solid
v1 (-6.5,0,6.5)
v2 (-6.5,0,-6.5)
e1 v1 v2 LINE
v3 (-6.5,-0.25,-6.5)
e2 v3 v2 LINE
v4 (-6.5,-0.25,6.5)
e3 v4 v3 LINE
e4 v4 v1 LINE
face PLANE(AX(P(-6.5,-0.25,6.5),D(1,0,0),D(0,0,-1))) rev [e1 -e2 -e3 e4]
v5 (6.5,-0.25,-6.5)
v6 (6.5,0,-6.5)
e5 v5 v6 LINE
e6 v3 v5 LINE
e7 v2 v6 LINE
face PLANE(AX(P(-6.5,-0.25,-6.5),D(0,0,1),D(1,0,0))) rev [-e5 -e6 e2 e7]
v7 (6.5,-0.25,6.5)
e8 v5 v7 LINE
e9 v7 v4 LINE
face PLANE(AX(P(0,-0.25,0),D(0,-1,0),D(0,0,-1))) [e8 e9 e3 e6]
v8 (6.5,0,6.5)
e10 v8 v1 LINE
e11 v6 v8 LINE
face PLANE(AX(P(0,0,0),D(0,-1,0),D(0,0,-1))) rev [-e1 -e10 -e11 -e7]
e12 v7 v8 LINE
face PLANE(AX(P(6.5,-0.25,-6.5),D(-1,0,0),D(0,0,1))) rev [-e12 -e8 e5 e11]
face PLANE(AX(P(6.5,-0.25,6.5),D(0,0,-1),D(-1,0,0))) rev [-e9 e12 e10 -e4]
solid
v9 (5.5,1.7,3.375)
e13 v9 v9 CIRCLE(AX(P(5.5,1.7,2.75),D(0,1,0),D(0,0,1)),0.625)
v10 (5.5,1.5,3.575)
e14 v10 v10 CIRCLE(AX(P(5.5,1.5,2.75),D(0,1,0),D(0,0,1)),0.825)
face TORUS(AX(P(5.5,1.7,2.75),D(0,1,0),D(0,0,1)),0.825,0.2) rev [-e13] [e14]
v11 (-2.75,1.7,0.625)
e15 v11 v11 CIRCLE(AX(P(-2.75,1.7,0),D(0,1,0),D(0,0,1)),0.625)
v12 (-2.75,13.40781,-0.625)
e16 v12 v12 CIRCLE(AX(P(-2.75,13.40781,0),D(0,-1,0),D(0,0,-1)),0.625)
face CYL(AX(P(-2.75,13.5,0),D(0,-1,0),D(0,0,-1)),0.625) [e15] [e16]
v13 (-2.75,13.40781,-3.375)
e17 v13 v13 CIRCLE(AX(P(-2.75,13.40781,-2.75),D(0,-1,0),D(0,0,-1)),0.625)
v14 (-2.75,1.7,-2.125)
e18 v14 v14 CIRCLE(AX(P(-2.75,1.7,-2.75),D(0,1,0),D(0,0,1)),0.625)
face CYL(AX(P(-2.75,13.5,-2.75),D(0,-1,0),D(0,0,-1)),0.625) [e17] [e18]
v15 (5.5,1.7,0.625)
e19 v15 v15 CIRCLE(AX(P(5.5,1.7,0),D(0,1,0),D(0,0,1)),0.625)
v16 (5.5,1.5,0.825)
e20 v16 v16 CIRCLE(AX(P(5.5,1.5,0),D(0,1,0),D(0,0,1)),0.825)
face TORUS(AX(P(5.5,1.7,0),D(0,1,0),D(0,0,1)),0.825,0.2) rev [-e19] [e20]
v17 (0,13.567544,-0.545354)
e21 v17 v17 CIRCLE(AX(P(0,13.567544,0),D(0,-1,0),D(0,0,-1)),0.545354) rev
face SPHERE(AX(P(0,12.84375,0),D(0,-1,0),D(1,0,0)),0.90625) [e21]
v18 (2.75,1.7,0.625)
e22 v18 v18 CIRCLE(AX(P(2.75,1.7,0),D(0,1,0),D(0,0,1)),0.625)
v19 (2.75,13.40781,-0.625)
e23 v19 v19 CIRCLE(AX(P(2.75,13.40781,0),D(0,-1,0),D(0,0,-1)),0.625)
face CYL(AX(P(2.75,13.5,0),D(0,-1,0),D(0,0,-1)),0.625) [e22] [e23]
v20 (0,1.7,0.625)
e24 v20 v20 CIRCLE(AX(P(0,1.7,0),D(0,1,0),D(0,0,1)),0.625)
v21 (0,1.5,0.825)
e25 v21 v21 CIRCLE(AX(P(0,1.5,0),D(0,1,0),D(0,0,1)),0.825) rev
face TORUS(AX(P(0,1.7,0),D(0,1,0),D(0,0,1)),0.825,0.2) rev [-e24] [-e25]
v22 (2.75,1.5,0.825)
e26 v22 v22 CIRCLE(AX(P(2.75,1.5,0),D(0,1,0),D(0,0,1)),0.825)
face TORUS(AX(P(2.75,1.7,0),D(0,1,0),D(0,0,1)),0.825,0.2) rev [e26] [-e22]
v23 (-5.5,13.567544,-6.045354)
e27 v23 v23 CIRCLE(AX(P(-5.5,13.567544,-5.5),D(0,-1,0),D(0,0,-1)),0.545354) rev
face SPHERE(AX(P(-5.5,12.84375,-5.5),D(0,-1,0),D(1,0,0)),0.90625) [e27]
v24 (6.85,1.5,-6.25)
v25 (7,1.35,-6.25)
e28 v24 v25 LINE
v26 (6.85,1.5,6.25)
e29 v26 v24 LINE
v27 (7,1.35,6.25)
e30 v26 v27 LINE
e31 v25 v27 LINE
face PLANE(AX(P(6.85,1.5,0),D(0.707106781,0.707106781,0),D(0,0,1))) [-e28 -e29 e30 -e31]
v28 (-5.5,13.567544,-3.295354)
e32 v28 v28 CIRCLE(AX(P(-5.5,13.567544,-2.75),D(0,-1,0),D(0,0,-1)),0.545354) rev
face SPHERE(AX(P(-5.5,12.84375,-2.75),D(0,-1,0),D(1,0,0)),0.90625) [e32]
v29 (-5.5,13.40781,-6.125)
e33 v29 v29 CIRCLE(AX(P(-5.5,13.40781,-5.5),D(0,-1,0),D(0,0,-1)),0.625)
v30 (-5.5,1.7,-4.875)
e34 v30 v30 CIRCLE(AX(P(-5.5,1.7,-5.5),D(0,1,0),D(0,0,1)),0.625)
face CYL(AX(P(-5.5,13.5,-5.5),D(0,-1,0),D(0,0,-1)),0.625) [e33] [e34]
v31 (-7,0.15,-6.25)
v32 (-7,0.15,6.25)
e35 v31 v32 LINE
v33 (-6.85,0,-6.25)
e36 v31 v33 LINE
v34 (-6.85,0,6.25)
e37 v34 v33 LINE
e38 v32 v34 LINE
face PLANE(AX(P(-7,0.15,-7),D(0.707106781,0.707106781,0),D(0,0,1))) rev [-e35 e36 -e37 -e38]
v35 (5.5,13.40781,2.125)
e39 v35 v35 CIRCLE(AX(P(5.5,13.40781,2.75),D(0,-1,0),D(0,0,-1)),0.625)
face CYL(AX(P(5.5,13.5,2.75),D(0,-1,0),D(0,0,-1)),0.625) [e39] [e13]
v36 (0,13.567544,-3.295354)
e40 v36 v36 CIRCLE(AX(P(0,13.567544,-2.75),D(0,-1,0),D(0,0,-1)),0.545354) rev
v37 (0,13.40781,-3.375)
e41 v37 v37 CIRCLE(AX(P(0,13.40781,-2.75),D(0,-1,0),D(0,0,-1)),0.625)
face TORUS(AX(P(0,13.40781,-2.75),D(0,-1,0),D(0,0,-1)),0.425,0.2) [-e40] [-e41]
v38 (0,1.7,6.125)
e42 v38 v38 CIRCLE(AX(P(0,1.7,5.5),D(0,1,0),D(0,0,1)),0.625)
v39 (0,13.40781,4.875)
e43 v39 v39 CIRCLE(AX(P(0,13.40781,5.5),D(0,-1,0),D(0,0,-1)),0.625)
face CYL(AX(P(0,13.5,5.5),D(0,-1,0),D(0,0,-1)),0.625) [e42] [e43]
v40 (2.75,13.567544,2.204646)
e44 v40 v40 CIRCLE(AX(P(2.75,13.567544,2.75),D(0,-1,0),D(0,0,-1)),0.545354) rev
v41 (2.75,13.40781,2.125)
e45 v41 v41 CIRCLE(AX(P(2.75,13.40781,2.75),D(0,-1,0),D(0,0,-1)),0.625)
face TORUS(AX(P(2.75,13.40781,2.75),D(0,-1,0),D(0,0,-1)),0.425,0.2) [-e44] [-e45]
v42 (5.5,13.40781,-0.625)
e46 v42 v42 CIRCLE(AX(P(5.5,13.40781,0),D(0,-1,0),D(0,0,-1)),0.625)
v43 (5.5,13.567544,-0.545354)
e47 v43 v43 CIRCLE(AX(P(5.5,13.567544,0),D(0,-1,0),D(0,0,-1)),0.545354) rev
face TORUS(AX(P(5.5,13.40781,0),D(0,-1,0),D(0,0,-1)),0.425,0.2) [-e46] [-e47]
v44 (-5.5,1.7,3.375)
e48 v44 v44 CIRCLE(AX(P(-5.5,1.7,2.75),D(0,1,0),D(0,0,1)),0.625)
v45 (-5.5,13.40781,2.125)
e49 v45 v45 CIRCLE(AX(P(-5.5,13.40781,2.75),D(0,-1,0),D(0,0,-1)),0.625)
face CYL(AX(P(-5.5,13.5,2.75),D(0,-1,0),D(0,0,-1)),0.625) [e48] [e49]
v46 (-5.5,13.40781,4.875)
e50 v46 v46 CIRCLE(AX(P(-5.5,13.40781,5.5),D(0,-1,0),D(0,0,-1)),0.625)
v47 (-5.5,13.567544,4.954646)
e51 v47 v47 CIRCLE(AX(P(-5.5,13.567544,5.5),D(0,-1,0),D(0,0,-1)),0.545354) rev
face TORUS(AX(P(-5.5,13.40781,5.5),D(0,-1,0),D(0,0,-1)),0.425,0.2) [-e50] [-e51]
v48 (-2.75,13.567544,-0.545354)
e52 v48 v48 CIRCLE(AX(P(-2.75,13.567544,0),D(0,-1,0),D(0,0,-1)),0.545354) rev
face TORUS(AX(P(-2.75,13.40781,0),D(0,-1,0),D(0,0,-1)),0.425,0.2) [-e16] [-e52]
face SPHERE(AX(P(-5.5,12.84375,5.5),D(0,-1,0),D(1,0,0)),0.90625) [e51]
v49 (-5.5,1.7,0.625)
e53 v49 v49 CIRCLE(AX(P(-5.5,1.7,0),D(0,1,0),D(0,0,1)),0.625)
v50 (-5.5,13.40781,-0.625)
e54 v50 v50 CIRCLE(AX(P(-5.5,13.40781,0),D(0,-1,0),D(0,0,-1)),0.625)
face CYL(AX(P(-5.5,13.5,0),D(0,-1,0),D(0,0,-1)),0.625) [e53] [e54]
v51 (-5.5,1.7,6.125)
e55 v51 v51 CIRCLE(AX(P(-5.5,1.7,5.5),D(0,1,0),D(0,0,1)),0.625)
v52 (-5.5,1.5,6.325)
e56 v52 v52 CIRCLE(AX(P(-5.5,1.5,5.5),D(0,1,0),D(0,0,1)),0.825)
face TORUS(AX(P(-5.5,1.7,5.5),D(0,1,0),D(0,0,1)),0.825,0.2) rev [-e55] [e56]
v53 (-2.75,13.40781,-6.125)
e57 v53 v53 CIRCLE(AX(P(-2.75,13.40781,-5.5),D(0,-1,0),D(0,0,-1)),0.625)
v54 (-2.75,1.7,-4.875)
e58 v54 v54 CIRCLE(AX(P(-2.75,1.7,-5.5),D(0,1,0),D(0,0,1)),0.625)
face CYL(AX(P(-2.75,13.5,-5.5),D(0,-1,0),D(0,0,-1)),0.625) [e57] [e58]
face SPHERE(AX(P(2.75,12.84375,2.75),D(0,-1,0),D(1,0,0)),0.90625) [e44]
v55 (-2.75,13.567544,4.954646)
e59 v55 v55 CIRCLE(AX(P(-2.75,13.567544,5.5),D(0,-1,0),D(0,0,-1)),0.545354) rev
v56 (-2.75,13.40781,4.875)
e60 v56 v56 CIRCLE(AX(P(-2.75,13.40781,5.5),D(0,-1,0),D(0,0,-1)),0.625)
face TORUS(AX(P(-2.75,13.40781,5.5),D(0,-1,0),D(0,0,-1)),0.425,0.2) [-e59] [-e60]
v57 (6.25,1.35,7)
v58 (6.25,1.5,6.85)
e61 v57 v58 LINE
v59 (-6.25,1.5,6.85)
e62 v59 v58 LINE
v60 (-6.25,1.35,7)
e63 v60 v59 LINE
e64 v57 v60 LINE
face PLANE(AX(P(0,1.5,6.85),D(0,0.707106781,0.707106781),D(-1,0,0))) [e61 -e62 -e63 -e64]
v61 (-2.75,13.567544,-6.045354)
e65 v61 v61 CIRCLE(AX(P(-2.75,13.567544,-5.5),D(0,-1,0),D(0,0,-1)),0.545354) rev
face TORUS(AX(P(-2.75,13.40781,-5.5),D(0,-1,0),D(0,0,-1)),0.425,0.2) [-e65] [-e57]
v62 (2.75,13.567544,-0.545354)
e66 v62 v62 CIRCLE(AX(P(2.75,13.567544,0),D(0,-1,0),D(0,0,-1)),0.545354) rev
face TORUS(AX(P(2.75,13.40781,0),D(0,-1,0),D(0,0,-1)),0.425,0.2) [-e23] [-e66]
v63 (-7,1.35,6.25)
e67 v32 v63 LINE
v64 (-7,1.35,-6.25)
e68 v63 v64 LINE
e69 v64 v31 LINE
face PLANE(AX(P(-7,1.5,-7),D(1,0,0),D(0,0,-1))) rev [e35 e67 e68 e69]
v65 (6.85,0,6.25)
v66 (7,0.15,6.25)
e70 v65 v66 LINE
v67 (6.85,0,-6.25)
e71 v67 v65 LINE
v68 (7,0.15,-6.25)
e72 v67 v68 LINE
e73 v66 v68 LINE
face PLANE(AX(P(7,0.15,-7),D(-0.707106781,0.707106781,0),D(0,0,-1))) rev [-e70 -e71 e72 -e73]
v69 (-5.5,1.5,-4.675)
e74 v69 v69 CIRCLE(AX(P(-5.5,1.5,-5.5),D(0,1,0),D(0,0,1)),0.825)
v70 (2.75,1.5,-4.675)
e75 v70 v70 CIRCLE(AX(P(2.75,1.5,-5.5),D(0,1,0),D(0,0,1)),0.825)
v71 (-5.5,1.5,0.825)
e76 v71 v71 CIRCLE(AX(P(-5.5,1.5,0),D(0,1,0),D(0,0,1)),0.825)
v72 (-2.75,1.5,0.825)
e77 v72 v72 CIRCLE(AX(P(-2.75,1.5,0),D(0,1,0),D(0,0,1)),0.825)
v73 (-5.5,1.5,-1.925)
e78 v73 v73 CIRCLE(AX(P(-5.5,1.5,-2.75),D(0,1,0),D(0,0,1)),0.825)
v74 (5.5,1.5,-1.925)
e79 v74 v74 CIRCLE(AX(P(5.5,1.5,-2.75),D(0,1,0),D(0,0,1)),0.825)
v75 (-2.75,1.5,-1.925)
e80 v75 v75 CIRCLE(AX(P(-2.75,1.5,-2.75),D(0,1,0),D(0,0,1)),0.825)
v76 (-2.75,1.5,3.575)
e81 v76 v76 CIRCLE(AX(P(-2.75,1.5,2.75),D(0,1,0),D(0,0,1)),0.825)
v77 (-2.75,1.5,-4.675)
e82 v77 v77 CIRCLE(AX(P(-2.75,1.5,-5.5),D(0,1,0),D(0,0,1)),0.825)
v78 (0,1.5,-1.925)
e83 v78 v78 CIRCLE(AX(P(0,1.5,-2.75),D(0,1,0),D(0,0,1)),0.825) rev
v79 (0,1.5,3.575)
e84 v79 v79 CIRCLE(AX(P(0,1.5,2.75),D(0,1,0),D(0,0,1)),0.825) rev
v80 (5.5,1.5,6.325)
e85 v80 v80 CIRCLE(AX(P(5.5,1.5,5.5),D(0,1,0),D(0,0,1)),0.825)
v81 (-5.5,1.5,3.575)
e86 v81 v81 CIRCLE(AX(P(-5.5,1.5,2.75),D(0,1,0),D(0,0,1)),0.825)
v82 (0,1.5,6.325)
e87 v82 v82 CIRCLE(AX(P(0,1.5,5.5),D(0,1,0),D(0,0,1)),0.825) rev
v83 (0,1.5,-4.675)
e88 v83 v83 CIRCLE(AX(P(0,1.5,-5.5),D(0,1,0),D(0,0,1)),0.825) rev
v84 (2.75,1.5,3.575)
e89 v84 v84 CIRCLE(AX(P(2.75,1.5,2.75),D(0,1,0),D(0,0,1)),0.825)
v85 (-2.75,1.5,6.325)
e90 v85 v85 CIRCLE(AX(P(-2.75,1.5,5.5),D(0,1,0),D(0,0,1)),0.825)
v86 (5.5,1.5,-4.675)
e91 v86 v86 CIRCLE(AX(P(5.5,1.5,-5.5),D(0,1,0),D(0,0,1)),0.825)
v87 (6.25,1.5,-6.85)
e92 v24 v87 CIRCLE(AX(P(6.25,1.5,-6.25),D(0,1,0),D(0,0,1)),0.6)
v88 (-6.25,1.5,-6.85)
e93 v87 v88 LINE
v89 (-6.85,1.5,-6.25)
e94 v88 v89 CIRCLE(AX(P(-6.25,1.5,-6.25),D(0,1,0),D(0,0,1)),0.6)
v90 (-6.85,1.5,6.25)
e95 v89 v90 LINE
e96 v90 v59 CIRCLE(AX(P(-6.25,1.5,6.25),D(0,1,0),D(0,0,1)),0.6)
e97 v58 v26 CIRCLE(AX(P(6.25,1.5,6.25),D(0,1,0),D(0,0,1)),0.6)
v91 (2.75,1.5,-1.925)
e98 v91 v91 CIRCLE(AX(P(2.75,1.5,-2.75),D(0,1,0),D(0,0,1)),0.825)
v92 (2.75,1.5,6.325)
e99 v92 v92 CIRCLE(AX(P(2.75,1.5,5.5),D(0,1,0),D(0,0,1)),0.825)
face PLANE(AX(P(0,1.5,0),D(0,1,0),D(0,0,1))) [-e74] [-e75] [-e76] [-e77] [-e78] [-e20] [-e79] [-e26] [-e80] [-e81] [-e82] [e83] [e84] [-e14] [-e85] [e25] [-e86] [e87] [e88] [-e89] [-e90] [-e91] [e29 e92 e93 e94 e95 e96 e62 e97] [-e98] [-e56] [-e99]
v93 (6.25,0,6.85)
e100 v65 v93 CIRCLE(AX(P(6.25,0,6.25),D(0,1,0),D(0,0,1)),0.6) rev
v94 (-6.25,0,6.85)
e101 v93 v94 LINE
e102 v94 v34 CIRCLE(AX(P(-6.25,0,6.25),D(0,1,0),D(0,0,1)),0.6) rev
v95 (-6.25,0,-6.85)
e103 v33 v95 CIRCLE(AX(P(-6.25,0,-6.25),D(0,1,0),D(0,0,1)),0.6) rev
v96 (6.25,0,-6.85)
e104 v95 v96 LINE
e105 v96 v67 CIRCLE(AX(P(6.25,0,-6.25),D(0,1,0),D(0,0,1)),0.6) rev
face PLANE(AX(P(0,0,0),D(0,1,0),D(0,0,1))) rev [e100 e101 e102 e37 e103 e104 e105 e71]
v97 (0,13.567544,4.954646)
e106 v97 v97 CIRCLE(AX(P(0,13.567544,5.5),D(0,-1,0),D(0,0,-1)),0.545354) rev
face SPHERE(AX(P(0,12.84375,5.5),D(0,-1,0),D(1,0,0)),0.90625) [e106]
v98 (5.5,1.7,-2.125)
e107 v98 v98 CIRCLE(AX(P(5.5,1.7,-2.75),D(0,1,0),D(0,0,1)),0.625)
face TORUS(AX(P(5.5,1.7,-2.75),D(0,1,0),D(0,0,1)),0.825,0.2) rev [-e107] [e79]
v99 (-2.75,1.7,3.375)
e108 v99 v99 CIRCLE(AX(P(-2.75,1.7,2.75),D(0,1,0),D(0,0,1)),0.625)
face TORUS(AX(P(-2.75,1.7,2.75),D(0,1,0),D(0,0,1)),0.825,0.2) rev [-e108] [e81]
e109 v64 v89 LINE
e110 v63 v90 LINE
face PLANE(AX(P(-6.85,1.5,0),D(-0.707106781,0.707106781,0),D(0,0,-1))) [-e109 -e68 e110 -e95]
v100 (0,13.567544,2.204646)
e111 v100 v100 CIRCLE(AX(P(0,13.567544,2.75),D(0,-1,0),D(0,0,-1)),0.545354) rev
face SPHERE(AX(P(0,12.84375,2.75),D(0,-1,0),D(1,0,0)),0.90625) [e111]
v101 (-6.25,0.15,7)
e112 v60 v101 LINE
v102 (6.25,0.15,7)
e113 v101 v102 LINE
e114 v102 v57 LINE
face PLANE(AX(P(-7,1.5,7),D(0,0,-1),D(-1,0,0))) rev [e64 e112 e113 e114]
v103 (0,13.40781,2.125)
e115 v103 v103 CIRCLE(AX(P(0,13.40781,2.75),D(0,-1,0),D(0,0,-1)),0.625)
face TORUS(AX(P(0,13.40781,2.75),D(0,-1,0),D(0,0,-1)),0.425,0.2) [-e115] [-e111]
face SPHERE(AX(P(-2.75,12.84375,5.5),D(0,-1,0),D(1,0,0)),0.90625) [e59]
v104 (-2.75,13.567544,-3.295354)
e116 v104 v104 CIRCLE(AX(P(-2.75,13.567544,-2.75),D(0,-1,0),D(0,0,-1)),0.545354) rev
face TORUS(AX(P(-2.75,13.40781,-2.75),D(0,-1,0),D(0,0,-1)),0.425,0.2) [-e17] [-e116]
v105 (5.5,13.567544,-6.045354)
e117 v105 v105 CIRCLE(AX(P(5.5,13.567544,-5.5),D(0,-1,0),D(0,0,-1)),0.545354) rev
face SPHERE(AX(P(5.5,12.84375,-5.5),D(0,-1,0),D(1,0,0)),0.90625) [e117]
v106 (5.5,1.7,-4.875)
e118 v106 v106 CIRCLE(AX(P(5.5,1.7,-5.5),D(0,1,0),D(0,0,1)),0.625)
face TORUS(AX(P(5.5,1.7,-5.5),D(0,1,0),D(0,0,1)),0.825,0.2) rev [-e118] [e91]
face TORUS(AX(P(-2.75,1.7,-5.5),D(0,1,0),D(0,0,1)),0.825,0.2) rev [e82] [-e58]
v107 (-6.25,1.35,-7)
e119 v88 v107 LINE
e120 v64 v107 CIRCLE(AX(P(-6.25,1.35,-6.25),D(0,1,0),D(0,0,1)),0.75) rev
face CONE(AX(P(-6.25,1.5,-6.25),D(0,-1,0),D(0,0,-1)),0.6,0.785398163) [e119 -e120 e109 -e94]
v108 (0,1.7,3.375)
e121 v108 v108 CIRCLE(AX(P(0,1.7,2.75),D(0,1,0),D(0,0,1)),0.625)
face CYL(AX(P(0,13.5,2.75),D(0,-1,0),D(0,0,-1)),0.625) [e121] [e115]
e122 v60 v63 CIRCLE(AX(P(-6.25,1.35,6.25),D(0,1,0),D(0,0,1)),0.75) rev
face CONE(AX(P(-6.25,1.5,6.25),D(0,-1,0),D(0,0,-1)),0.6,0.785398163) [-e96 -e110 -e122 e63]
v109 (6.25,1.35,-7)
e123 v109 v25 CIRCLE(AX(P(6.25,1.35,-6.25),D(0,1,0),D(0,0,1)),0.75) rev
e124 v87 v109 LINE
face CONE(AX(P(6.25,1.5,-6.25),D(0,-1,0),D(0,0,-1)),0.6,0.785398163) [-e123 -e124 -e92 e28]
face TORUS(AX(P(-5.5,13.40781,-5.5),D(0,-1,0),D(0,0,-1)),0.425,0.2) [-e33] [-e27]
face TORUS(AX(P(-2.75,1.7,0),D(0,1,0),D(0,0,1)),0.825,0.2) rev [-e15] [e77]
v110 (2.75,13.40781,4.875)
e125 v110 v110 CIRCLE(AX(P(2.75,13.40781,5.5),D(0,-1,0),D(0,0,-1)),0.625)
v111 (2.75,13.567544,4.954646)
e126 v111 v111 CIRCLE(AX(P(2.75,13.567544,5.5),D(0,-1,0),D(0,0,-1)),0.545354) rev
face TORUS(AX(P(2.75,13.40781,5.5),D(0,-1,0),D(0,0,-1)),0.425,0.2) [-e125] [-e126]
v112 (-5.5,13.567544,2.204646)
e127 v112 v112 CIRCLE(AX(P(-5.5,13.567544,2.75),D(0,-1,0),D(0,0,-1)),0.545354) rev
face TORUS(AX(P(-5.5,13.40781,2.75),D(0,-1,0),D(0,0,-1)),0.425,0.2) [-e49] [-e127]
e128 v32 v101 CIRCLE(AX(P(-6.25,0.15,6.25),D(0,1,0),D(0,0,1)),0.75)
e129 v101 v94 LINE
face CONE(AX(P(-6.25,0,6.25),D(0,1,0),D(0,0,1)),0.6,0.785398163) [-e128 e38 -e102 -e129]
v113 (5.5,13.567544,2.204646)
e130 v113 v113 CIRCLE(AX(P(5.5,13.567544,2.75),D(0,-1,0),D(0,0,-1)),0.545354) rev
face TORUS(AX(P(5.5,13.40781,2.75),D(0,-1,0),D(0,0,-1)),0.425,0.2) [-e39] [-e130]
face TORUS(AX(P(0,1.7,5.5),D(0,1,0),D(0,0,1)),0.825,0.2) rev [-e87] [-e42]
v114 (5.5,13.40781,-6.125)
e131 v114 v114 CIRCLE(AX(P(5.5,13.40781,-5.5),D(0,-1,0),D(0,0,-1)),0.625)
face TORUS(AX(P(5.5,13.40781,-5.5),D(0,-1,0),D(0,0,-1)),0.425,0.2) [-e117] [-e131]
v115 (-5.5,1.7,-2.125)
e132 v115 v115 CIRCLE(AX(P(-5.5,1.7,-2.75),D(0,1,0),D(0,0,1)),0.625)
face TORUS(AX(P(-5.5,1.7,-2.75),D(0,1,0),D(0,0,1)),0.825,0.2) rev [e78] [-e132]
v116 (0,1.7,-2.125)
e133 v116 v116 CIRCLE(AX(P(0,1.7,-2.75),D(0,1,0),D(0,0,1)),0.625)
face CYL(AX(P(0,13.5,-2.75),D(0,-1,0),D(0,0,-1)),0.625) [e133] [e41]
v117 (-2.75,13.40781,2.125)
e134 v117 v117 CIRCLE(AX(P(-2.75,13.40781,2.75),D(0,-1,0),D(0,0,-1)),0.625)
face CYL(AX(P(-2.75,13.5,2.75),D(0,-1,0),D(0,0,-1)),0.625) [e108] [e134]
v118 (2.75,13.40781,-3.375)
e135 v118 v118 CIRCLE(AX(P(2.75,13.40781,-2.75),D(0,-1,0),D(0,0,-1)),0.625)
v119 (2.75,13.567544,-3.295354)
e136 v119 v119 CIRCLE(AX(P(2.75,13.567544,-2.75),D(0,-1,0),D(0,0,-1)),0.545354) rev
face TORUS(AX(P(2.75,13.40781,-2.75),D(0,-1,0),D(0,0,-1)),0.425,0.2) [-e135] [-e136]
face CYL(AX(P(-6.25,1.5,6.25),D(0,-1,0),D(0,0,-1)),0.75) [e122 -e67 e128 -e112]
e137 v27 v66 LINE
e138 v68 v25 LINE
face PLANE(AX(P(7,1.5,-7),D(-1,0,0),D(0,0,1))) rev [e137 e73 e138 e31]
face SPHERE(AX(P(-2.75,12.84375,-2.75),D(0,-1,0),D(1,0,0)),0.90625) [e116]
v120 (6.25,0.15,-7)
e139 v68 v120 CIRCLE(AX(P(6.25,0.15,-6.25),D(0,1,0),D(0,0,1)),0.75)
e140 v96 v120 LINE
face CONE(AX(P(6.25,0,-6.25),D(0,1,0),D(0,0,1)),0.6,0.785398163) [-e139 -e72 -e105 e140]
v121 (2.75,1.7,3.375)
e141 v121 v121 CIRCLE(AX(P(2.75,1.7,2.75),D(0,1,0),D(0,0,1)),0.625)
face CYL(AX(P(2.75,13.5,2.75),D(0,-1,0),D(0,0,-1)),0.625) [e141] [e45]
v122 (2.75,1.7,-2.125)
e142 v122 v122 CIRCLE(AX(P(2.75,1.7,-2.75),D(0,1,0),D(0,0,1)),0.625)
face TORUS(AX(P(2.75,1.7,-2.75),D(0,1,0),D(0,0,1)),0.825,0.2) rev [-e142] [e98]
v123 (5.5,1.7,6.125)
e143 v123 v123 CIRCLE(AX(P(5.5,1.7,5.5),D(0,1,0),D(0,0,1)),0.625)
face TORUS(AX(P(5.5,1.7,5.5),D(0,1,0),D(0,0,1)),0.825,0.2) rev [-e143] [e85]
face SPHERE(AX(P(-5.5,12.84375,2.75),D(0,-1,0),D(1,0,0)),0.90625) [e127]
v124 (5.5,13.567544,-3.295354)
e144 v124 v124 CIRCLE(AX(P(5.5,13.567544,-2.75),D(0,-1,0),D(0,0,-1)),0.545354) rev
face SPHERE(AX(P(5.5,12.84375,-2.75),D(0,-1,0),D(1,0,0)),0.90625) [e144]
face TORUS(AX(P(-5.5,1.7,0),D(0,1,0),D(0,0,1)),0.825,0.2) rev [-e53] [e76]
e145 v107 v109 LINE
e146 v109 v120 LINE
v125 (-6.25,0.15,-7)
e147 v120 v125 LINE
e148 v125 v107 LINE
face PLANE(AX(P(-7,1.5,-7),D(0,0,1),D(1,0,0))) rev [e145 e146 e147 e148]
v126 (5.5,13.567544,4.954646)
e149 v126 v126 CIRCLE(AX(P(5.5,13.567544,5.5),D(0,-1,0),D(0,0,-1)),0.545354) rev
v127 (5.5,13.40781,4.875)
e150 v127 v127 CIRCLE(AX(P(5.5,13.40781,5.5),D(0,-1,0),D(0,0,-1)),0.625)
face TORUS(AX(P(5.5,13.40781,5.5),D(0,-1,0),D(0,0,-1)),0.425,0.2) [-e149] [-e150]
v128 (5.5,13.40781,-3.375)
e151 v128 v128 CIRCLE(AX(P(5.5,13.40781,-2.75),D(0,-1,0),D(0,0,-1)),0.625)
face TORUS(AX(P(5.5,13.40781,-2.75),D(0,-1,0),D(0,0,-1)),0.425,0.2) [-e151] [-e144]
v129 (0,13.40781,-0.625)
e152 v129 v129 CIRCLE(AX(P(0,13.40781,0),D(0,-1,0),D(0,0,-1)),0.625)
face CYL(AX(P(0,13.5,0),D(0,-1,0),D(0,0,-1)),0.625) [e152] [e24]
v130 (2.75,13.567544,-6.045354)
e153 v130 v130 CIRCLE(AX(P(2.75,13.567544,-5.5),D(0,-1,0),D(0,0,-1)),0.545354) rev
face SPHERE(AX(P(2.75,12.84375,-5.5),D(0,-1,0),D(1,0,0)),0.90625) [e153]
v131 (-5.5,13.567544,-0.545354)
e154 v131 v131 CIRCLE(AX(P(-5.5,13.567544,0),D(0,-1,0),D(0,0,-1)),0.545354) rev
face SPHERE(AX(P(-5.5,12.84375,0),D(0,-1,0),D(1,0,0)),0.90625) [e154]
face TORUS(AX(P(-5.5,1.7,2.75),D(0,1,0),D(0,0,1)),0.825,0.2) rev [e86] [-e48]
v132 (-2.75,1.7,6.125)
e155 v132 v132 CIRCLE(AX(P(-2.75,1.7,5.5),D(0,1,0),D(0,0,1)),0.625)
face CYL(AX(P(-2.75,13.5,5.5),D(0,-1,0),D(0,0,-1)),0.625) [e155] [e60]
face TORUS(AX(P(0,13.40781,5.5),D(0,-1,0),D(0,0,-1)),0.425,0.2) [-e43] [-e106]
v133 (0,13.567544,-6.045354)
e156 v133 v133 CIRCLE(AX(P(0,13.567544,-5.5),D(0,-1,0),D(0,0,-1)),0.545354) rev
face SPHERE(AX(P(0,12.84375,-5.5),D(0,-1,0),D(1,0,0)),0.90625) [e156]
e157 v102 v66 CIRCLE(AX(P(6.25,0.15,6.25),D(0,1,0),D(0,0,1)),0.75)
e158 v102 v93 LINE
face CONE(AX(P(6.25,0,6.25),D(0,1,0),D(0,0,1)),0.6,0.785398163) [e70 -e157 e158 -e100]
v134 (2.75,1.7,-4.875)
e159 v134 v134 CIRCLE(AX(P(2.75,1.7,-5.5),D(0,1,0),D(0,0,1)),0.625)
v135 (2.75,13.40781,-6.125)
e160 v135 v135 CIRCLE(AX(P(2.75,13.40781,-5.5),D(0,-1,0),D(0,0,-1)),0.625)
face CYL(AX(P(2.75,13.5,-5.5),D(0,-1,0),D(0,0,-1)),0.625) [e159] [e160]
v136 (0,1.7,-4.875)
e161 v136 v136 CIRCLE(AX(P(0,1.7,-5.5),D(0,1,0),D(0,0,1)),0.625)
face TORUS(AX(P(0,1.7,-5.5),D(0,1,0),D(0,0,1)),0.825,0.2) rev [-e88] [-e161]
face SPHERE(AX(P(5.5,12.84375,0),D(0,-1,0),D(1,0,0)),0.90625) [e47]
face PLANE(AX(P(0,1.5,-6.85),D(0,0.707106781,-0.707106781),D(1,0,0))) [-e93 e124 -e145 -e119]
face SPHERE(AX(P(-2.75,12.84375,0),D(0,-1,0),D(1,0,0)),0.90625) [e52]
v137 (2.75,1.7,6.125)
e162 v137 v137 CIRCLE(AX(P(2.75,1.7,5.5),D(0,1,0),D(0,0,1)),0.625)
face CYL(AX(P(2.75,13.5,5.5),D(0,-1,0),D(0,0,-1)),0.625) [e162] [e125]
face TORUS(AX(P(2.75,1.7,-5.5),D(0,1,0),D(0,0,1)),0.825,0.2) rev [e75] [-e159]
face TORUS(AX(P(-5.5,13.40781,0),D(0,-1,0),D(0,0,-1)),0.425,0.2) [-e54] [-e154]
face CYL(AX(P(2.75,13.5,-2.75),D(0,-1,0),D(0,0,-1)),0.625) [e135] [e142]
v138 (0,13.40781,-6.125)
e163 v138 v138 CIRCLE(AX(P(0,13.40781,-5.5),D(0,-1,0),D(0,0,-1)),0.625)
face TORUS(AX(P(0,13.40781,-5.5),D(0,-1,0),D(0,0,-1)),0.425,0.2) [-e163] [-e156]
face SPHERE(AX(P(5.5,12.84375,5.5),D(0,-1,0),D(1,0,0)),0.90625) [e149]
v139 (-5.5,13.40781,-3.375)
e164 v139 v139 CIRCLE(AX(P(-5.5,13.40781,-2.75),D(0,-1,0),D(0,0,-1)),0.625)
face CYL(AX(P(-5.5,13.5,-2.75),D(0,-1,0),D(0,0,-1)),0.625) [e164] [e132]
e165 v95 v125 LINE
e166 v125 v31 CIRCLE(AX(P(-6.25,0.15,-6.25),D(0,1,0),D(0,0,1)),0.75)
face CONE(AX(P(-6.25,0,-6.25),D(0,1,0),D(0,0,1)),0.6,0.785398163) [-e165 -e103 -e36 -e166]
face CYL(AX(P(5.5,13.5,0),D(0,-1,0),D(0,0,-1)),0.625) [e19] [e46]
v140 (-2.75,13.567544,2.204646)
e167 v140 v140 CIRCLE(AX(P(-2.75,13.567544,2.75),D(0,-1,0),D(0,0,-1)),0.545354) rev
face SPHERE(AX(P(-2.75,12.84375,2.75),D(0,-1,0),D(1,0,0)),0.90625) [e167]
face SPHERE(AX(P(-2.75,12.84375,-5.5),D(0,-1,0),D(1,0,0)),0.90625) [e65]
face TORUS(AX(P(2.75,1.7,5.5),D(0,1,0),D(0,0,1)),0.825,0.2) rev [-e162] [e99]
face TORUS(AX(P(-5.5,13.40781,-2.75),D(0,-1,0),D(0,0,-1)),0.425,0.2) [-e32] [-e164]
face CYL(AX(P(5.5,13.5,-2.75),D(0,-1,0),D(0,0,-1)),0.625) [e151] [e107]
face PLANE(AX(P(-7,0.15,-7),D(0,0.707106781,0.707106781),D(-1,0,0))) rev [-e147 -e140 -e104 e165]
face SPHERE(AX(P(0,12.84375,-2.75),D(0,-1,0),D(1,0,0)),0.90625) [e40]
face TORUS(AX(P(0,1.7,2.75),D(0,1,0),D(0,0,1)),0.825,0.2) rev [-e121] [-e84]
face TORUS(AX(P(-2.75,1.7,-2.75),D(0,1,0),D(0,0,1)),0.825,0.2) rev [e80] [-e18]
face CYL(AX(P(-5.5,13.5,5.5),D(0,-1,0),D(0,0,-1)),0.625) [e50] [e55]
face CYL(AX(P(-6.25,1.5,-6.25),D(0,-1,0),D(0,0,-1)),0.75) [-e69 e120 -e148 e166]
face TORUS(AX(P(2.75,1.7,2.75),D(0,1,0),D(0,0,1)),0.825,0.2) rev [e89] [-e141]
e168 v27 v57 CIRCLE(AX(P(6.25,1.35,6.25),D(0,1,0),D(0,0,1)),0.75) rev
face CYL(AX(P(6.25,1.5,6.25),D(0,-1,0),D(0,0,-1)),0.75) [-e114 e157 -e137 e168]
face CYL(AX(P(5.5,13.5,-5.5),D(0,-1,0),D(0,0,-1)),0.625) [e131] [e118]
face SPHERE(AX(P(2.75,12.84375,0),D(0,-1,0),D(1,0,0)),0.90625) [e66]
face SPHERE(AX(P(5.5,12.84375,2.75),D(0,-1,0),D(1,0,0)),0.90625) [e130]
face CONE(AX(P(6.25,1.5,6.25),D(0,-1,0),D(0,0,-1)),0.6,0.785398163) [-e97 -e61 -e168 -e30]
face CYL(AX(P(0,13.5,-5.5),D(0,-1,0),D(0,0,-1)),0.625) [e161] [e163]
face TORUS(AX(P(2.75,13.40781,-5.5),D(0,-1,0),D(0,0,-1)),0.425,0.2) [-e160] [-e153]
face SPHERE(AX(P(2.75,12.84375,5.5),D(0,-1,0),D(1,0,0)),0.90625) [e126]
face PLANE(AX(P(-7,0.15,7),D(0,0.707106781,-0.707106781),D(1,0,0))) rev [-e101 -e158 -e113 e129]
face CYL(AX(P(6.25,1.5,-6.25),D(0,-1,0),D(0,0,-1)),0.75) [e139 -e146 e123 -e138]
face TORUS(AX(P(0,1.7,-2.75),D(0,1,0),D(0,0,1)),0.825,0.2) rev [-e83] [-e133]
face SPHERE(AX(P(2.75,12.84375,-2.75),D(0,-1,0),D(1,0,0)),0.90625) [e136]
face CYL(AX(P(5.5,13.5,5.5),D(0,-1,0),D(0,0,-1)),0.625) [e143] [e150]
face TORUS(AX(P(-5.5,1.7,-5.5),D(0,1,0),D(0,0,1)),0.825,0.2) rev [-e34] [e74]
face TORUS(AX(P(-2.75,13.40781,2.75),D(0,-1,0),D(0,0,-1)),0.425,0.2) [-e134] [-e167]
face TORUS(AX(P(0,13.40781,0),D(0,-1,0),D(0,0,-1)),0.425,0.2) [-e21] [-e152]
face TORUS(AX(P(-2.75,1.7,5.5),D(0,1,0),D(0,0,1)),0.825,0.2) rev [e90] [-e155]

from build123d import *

# Parameters (mm, degrees)
BOSS_EXTRU_1_DEPTH                   = 1.5
CONG_1_R                             = 0.75
CHANFREIN1_SIZE                      = 0.15
ESQUISSE3_R                          = 0.625
BOSS_EXTRU_2_DEPTH                   = 12
CONG_2_R                             = 0.2
R_P_TITION_LIN_AIRE1_COUNT           = 3
R_P_TITION_LIN_AIRE1_PITCH           = 2.75
CONG_2_OF_R_P_TITION_LIN_AIRE1_R     = 0.2
R_P_TITION_LIN_AIRE1_COL_COUNT       = 3
R_P_TITION_LIN_AIRE1_COL_PITCH       = 2.75
CONG_2_OF_R_P_TITION_LIN_AIRE1_COL_R = 0.2
BOSS_EXTRU_3_DEPTH                   = 0.25


# Read off the part's stored shape, not the designer's step: Répétition linéaire2
with BuildPart() as part:
    # Esquisse1 → Boss.-Extru.1 (new body)
    with BuildSketch(Plane(origin=(0, 0, 0), x_dir=(1, 0, 0), z_dir=(0, 1, 0))):
        Polygon((-6.999999999999999, 6.999999999999999), (6.999999999999999, 6.999999999999999), (7.000000000000003, -6.999999999999999), (-6.999999999999996, -6.999999999999999), align=None)
    extrude(amount=BOSS_EXTRU_1_DEPTH)

    # Congé1
    cong_1_edges = [part.edges().sort_by_distance(p)[0] for p in [
        (7.000000000000003, 0.75, 6.999999999999999),
        (-6.999999999999996, 0.75, 6.999999999999999),
        (-6.999999999999999, 0.75, -6.999999999999999),
        (6.999999999999999, 0.75, -6.999999999999999),
    ]]
    fillet(cong_1_edges, radius=CONG_1_R)

    # Chanfrein1
    chanfrein1_edges = [part.edges().sort_by_distance(p)[0] for p in [
        (3.55e-15, 0, 6.999999999999999),
        (3.55e-15, 1.5, 6.999999999999999),
        (7.000000000000001, 0, 0),
        (-6.999999999999997, 0, 0),
        (0, 0, -6.999999999999999),
        (6.780330085889913, 0, 6.78033008588991),
        (6.78033008588991, 0, -6.78033008588991),
        (-6.78033008588991, 0, -6.78033008588991),
        (-6.780330085889906, 0, 6.78033008588991),
        (-6.999999999999997, 1.5, 0),
        (7.000000000000001, 1.5, 0),
        (0, 1.5, -6.999999999999999),
        (6.780330085889913, 1.5, 6.78033008588991),
        (6.78033008588991, 1.5, -6.78033008588991),
        (-6.78033008588991, 1.5, -6.78033008588991),
        (-6.780330085889906, 1.5, 6.78033008588991),
    ]]
    chamfer(chanfrein1_edges, length=CHANFREIN1_SIZE)

    # Esquisse3 → Boss.-Extru.2 (add)
    with BuildSketch(Plane(origin=(0, 1.5, 0), x_dir=(1, 0, 0), z_dir=(0, 1, 0))):
        with Locations(Location((0, 0, 0), (0, 0, 270))):
            Circle(ESQUISSE3_R)
    boss_extru_2 = extrude(amount=BOSS_EXTRU_2_DEPTH)

    # Esquisse4 → Révolution1 (revolve)
    with BuildSketch(Plane.XY):
        with BuildLine():
            Line((0, 13.5), (0, 13.75))
            ThreePointArc((0, 13.75), (0.3365728004459065, 13.685182001114766), (0.625, 13.5))
            Line((0.625, 13.5), (0, 13.5))
        make_face()
    r_volution1 = revolve(axis=Axis((0, 13.5, 0), (0, 1, 0)))

    # Congé2
    cong_2_edges = [part.edges().sort_by_distance(p)[0] for p in [
        (1.9e-16, 1.5, -0.625),
        (-0.4419417382415921, 13.5, -0.4419417382415924),
    ]]
    fillet(cong_2_edges, radius=CONG_2_R)

    # Répétition linéaire1: Boss.-Extru.2, Révolution1 ×3
    with Locations(*[(0, 0, -i * R_P_TITION_LIN_AIRE1_PITCH) for i in range(1, R_P_TITION_LIN_AIRE1_COUNT)]):
        add(boss_extru_2)
        add(r_volution1)

    # Congé2 of Répétition linéaire1
    cong_2_of_r_p_tition_lin_aire1_edges = [part.edges().sort_by_distance(p)[0] for p in [
        (-5.7e-16, 1.5, -3.375),
        (-0.4419417382415929, 13.5, -3.191941738241592),
        (-1.34e-15, 1.5, -6.125),
        (-0.44194173824159366, 13.5, -5.941941738241592),
    ]]
    fillet(cong_2_of_r_p_tition_lin_aire1_edges, radius=CONG_2_OF_R_P_TITION_LIN_AIRE1_R)

    # Répétition linéaire1 col: Boss.-Extru.2, Révolution1 ×3
    with Locations(*[(0, 0, i * R_P_TITION_LIN_AIRE1_COL_PITCH) for i in range(1, R_P_TITION_LIN_AIRE1_COL_COUNT)]):
        add(boss_extru_2)
        add(r_volution1)

    # Congé2 of Répétition linéaire1 col
    cong_2_of_r_p_tition_lin_aire1_col_edges = [part.edges().sort_by_distance(p)[0] for p in [
        (9.5e-16, 1.5, 2.125),
        (-0.44194173824159133, 13.5, 2.308058261758408),
        (1.72e-15, 1.5, 4.875),
        (-0.44194173824159055, 13.5, 5.058058261758408),
    ]]
    fillet(cong_2_of_r_p_tition_lin_aire1_col_edges, radius=CONG_2_OF_R_P_TITION_LIN_AIRE1_COL_R)

    # Répétition linéaire2 outline → Répétition linéaire2 (revolve)
    with BuildSketch(Plane(origin=(2.75, 0, -2.75), x_dir=(1, 0, 0), z_dir=(0, 0, 1))):
        with BuildLine():
            Line((0, 1.5), (0.825, 1.5))
            ThreePointArc((0.825, 1.5), (0.683578644, 1.558578644), (0.625, 1.7))
            Line((0.625, 1.7), (0.625, 13.407810336))
            ThreePointArc((0.625, 13.407810336), (0.603984352, 13.497054953), (0.545353982, 13.567544236))
            ThreePointArc((0.545353982, 13.567544236), (0.287533073, 13.703176433), (0, 13.75))
            Line((0, 13.75), (0, 1.5))
        make_face()
    revolve(axis=Axis((2.75, 0, -2.75), (0, 1, 0)))

    # R_p_tition lin_aire2 2 outline → R_p_tition lin_aire2 2 (revolve)
    with BuildSketch(Plane(origin=(5.5, 0, -2.75), x_dir=(1, 0, 0), z_dir=(0, 0, 1))):
        with BuildLine():
            Line((0, 1.5), (0.825, 1.5))
            ThreePointArc((0.825, 1.5), (0.683578644, 1.558578644), (0.625, 1.7))
            Line((0.625, 1.7), (0.625, 13.407810336))
            ThreePointArc((0.625, 13.407810336), (0.603984352, 13.497054953), (0.545353982, 13.567544236))
            ThreePointArc((0.545353982, 13.567544236), (0.287533073, 13.703176433), (0, 13.75))
            Line((0, 13.75), (0, 1.5))
        make_face()
    revolve(axis=Axis((5.5, 0, -2.75), (0, 1, 0)))

    # R_p_tition lin_aire2 3 outline → R_p_tition lin_aire2 3 (revolve)
    with BuildSketch(Plane(origin=(-2.75, 0, -2.75), x_dir=(1, 0, 0), z_dir=(0, 0, 1))):
        with BuildLine():
            Line((0, 1.5), (0.825, 1.5))
            ThreePointArc((0.825, 1.5), (0.683578644, 1.558578644), (0.625, 1.7))
            Line((0.625, 1.7), (0.625, 13.407810336))
            ThreePointArc((0.625, 13.407810336), (0.603984352, 13.497054953), (0.545353982, 13.567544236))
            ThreePointArc((0.545353982, 13.567544236), (0.287533073, 13.703176433), (0, 13.75))
            Line((0, 13.75), (0, 1.5))
        make_face()
    revolve(axis=Axis((-2.75, 0, -2.75), (0, 1, 0)))

    # R_p_tition lin_aire2 4 outline → R_p_tition lin_aire2 4 (revolve)
    with BuildSketch(Plane(origin=(-5.5, 0, -2.75), x_dir=(1, 0, 0), z_dir=(0, 0, 1))):
        with BuildLine():
            Line((0, 1.5), (0.825, 1.5))
            ThreePointArc((0.825, 1.5), (0.683578644, 1.558578644), (0.625, 1.7))
            Line((0.625, 1.7), (0.625, 13.407810336))
            ThreePointArc((0.625, 13.407810336), (0.603984352, 13.497054953), (0.545353982, 13.567544236))
            ThreePointArc((0.545353982, 13.567544236), (0.287533073, 13.703176433), (0, 13.75))
            Line((0, 13.75), (0, 1.5))
        make_face()
    revolve(axis=Axis((-5.5, 0, -2.75), (0, 1, 0)))

    # R_p_tition lin_aire2 5 outline → R_p_tition lin_aire2 5 (revolve)
    with BuildSketch(Plane(origin=(2.75, 0, 0), x_dir=(1, 0, 0), z_dir=(0, 0, 1))):
        with BuildLine():
            Line((0, 1.5), (0.825, 1.5))
            ThreePointArc((0.825, 1.5), (0.683578644, 1.558578644), (0.625, 1.7))
            Line((0.625, 1.7), (0.625, 13.407810336))
            ThreePointArc((0.625, 13.407810336), (0.603984352, 13.497054953), (0.545353982, 13.567544236))
            ThreePointArc((0.545353982, 13.567544236), (0.287533073, 13.703176433), (0, 13.75))
            Line((0, 13.75), (0, 1.5))
        make_face()
    revolve(axis=Axis((2.75, 0, 0), (0, 1, 0)))

    # R_p_tition lin_aire2 6 outline → R_p_tition lin_aire2 6 (revolve)
    with BuildSketch(Plane(origin=(5.5, 0, 0), x_dir=(1, 0, 0), z_dir=(0, 0, 1))):
        with BuildLine():
            Line((0, 1.5), (0.825, 1.5))
            ThreePointArc((0.825, 1.5), (0.683578644, 1.558578644), (0.625, 1.7))
            Line((0.625, 1.7), (0.625, 13.407810336))
            ThreePointArc((0.625, 13.407810336), (0.603984352, 13.497054953), (0.545353982, 13.567544236))
            ThreePointArc((0.545353982, 13.567544236), (0.287533073, 13.703176433), (0, 13.75))
            Line((0, 13.75), (0, 1.5))
        make_face()
    revolve(axis=Axis((5.5, 0, 0), (0, 1, 0)))

    # R_p_tition lin_aire2 7 outline → R_p_tition lin_aire2 7 (revolve)
    with BuildSketch(Plane(origin=(-2.75, 0, 0), x_dir=(1, 0, 0), z_dir=(0, 0, 1))):
        with BuildLine():
            Line((0, 1.5), (0.825, 1.5))
            ThreePointArc((0.825, 1.5), (0.683578644, 1.558578644), (0.625, 1.7))
            Line((0.625, 1.7), (0.625, 13.407810336))
            ThreePointArc((0.625, 13.407810336), (0.603984352, 13.497054953), (0.545353982, 13.567544236))
            ThreePointArc((0.545353982, 13.567544236), (0.287533073, 13.703176433), (0, 13.75))
            Line((0, 13.75), (0, 1.5))
        make_face()
    revolve(axis=Axis((-2.75, 0, 0), (0, 1, 0)))

    # R_p_tition lin_aire2 8 outline → R_p_tition lin_aire2 8 (revolve)
    with BuildSketch(Plane(origin=(-5.5, 0, 0), x_dir=(1, 0, 0), z_dir=(0, 0, 1))):
        with BuildLine():
            Line((0, 1.5), (0.825, 1.5))
            ThreePointArc((0.825, 1.5), (0.683578644, 1.558578644), (0.625, 1.7))
            Line((0.625, 1.7), (0.625, 13.407810336))
            ThreePointArc((0.625, 13.407810336), (0.603984352, 13.497054953), (0.545353982, 13.567544236))
            ThreePointArc((0.545353982, 13.567544236), (0.287533073, 13.703176433), (0, 13.75))
            Line((0, 13.75), (0, 1.5))
        make_face()
    revolve(axis=Axis((-5.5, 0, 0), (0, 1, 0)))

    # R_p_tition lin_aire2 9 outline → R_p_tition lin_aire2 9 (revolve)
    with BuildSketch(Plane(origin=(2.75, 0, 5.5), x_dir=(1, 0, 0), z_dir=(0, 0, 1))):
        with BuildLine():
            Line((0, 1.5), (0.825, 1.5))
            ThreePointArc((0.825, 1.5), (0.683578644, 1.558578644), (0.625, 1.7))
            Line((0.625, 1.7), (0.625, 13.407810336))
            ThreePointArc((0.625, 13.407810336), (0.603984352, 13.497054953), (0.545353982, 13.567544236))
            ThreePointArc((0.545353982, 13.567544236), (0.287533073, 13.703176433), (0, 13.75))
            Line((0, 13.75), (0, 1.5))
        make_face()
    revolve(axis=Axis((2.75, 0, 5.5), (0, 1, 0)))

    # R_p_tition lin_aire2 10 outline → R_p_tition lin_aire2 10 (revolve)
    with BuildSketch(Plane(origin=(5.5, 0, 5.5), x_dir=(1, 0, 0), z_dir=(0, 0, 1))):
        with BuildLine():
            Line((0, 1.5), (0.825, 1.5))
            ThreePointArc((0.825, 1.5), (0.683578644, 1.558578644), (0.625, 1.7))
            Line((0.625, 1.7), (0.625, 13.407810336))
            ThreePointArc((0.625, 13.407810336), (0.603984352, 13.497054953), (0.545353982, 13.567544236))
            ThreePointArc((0.545353982, 13.567544236), (0.287533073, 13.703176433), (0, 13.75))
            Line((0, 13.75), (0, 1.5))
        make_face()
    revolve(axis=Axis((5.5, 0, 5.5), (0, 1, 0)))

    # R_p_tition lin_aire2 11 outline → R_p_tition lin_aire2 11 (revolve)
    with BuildSketch(Plane(origin=(-2.75, 0, 5.5), x_dir=(1, 0, 0), z_dir=(0, 0, 1))):
        with BuildLine():
            Line((0, 1.5), (0.825, 1.5))
            ThreePointArc((0.825, 1.5), (0.683578644, 1.558578644), (0.625, 1.7))
            Line((0.625, 1.7), (0.625, 13.407810336))
            ThreePointArc((0.625, 13.407810336), (0.603984352, 13.497054953), (0.545353982, 13.567544236))
            ThreePointArc((0.545353982, 13.567544236), (0.287533073, 13.703176433), (0, 13.75))
            Line((0, 13.75), (0, 1.5))
        make_face()
    revolve(axis=Axis((-2.75, 0, 5.5), (0, 1, 0)))

    # R_p_tition lin_aire2 12 outline → R_p_tition lin_aire2 12 (revolve)
    with BuildSketch(Plane(origin=(-5.5, 0, 5.5), x_dir=(1, 0, 0), z_dir=(0, 0, 1))):
        with BuildLine():
            Line((0, 1.5), (0.825, 1.5))
            ThreePointArc((0.825, 1.5), (0.683578644, 1.558578644), (0.625, 1.7))
            Line((0.625, 1.7), (0.625, 13.407810336))
            ThreePointArc((0.625, 13.407810336), (0.603984352, 13.497054953), (0.545353982, 13.567544236))
            ThreePointArc((0.545353982, 13.567544236), (0.287533073, 13.703176433), (0, 13.75))
            Line((0, 13.75), (0, 1.5))
        make_face()
    revolve(axis=Axis((-5.5, 0, 5.5), (0, 1, 0)))

    # R_p_tition lin_aire2 13 outline → R_p_tition lin_aire2 13 (revolve)
    with BuildSketch(Plane(origin=(2.75, 0, 2.75), x_dir=(1, 0, 0), z_dir=(0, 0, 1))):
        with BuildLine():
            Line((0, 1.5), (0.825, 1.5))
            ThreePointArc((0.825, 1.5), (0.683578644, 1.558578644), (0.625, 1.7))
            Line((0.625, 1.7), (0.625, 13.407810336))
            ThreePointArc((0.625, 13.407810336), (0.603984352, 13.497054953), (0.545353982, 13.567544236))
            ThreePointArc((0.545353982, 13.567544236), (0.287533073, 13.703176433), (0, 13.75))
            Line((0, 13.75), (0, 1.5))
        make_face()
    revolve(axis=Axis((2.75, 0, 2.75), (0, 1, 0)))

    # R_p_tition lin_aire2 14 outline → R_p_tition lin_aire2 14 (revolve)
    with BuildSketch(Plane(origin=(5.5, 0, 2.75), x_dir=(1, 0, 0), z_dir=(0, 0, 1))):
        with BuildLine():
            Line((0, 1.5), (0.825, 1.5))
            ThreePointArc((0.825, 1.5), (0.683578644, 1.558578644), (0.625, 1.7))
            Line((0.625, 1.7), (0.625, 13.407810336))
            ThreePointArc((0.625, 13.407810336), (0.603984352, 13.497054953), (0.545353982, 13.567544236))
            ThreePointArc((0.545353982, 13.567544236), (0.287533073, 13.703176433), (0, 13.75))
            Line((0, 13.75), (0, 1.5))
        make_face()
    revolve(axis=Axis((5.5, 0, 2.75), (0, 1, 0)))

    # R_p_tition lin_aire2 15 outline → R_p_tition lin_aire2 15 (revolve)
    with BuildSketch(Plane(origin=(-2.75, 0, 2.75), x_dir=(1, 0, 0), z_dir=(0, 0, 1))):
        with BuildLine():
            Line((0, 1.5), (0.825, 1.5))
            ThreePointArc((0.825, 1.5), (0.683578644, 1.558578644), (0.625, 1.7))
            Line((0.625, 1.7), (0.625, 13.407810336))
            ThreePointArc((0.625, 13.407810336), (0.603984352, 13.497054953), (0.545353982, 13.567544236))
            ThreePointArc((0.545353982, 13.567544236), (0.287533073, 13.703176433), (0, 13.75))
            Line((0, 13.75), (0, 1.5))
        make_face()
    revolve(axis=Axis((-2.75, 0, 2.75), (0, 1, 0)))

    # R_p_tition lin_aire2 16 outline → R_p_tition lin_aire2 16 (revolve)
    with BuildSketch(Plane(origin=(-5.5, 0, 2.75), x_dir=(1, 0, 0), z_dir=(0, 0, 1))):
        with BuildLine():
            Line((0, 1.5), (0.825, 1.5))
            ThreePointArc((0.825, 1.5), (0.683578644, 1.558578644), (0.625, 1.7))
            Line((0.625, 1.7), (0.625, 13.407810336))
            ThreePointArc((0.625, 13.407810336), (0.603984352, 13.497054953), (0.545353982, 13.567544236))
            ThreePointArc((0.545353982, 13.567544236), (0.287533073, 13.703176433), (0, 13.75))
            Line((0, 13.75), (0, 1.5))
        make_face()
    revolve(axis=Axis((-5.5, 0, 2.75), (0, 1, 0)))

    # R_p_tition lin_aire2 17 outline → R_p_tition lin_aire2 17 (revolve)
    with BuildSketch(Plane(origin=(2.75, 0, -5.5), x_dir=(1, 0, 0), z_dir=(0, 0, 1))):
        with BuildLine():
            Line((0, 1.5), (0.825, 1.5))
            ThreePointArc((0.825, 1.5), (0.683578644, 1.558578644), (0.625, 1.7))
            Line((0.625, 1.7), (0.625, 13.407810336))
            ThreePointArc((0.625, 13.407810336), (0.603984352, 13.497054953), (0.545353982, 13.567544236))
            ThreePointArc((0.545353982, 13.567544236), (0.287533073, 13.703176433), (0, 13.75))
            Line((0, 13.75), (0, 1.5))
        make_face()
    revolve(axis=Axis((2.75, 0, -5.5), (0, 1, 0)))

    # R_p_tition lin_aire2 18 outline → R_p_tition lin_aire2 18 (revolve)
    with BuildSketch(Plane(origin=(5.5, 0, -5.5), x_dir=(1, 0, 0), z_dir=(0, 0, 1))):
        with BuildLine():
            Line((0, 1.5), (0.825, 1.5))
            ThreePointArc((0.825, 1.5), (0.683578644, 1.558578644), (0.625, 1.7))
            Line((0.625, 1.7), (0.625, 13.407810336))
            ThreePointArc((0.625, 13.407810336), (0.603984352, 13.497054953), (0.545353982, 13.567544236))
            ThreePointArc((0.545353982, 13.567544236), (0.287533073, 13.703176433), (0, 13.75))
            Line((0, 13.75), (0, 1.5))
        make_face()
    revolve(axis=Axis((5.5, 0, -5.5), (0, 1, 0)))

    # R_p_tition lin_aire2 19 outline → R_p_tition lin_aire2 19 (revolve)
    with BuildSketch(Plane(origin=(-2.75, 0, -5.5), x_dir=(1, 0, 0), z_dir=(0, 0, 1))):
        with BuildLine():
            Line((0, 1.5), (0.825, 1.5))
            ThreePointArc((0.825, 1.5), (0.683578644, 1.558578644), (0.625, 1.7))
            Line((0.625, 1.7), (0.625, 13.407810336))
            ThreePointArc((0.625, 13.407810336), (0.603984352, 13.497054953), (0.545353982, 13.567544236))
            ThreePointArc((0.545353982, 13.567544236), (0.287533073, 13.703176433), (0, 13.75))
            Line((0, 13.75), (0, 1.5))
        make_face()
    revolve(axis=Axis((-2.75, 0, -5.5), (0, 1, 0)))

    # R_p_tition lin_aire2 20 outline → R_p_tition lin_aire2 20 (revolve)
    with BuildSketch(Plane(origin=(-5.5, 0, -5.5), x_dir=(1, 0, 0), z_dir=(0, 0, 1))):
        with BuildLine():
            Line((0, 1.5), (0.825, 1.5))
            ThreePointArc((0.825, 1.5), (0.683578644, 1.558578644), (0.625, 1.7))
            Line((0.625, 1.7), (0.625, 13.407810336))
            ThreePointArc((0.625, 13.407810336), (0.603984352, 13.497054953), (0.545353982, 13.567544236))
            ThreePointArc((0.545353982, 13.567544236), (0.287533073, 13.703176433), (0, 13.75))
            Line((0, 13.75), (0, 1.5))
        make_face()
    revolve(axis=Axis((-5.5, 0, -5.5), (0, 1, 0)))


with BuildPart() as body_2:
    # Esquisse5 → Boss.-Extru.3 (new body)
    with BuildSketch(Plane.XZ):
        Polygon((-6.499999999999996, 6.499999999999999), (-6.499999999999999, -6.499999999999999), (6.499999999999999, -6.499999999999999), (6.500000000000003, 6.499999999999999), align=None)
    extrude(amount=BOSS_EXTRU_3_DEPTH)


solid = Compound([part.part, body_2.part])
